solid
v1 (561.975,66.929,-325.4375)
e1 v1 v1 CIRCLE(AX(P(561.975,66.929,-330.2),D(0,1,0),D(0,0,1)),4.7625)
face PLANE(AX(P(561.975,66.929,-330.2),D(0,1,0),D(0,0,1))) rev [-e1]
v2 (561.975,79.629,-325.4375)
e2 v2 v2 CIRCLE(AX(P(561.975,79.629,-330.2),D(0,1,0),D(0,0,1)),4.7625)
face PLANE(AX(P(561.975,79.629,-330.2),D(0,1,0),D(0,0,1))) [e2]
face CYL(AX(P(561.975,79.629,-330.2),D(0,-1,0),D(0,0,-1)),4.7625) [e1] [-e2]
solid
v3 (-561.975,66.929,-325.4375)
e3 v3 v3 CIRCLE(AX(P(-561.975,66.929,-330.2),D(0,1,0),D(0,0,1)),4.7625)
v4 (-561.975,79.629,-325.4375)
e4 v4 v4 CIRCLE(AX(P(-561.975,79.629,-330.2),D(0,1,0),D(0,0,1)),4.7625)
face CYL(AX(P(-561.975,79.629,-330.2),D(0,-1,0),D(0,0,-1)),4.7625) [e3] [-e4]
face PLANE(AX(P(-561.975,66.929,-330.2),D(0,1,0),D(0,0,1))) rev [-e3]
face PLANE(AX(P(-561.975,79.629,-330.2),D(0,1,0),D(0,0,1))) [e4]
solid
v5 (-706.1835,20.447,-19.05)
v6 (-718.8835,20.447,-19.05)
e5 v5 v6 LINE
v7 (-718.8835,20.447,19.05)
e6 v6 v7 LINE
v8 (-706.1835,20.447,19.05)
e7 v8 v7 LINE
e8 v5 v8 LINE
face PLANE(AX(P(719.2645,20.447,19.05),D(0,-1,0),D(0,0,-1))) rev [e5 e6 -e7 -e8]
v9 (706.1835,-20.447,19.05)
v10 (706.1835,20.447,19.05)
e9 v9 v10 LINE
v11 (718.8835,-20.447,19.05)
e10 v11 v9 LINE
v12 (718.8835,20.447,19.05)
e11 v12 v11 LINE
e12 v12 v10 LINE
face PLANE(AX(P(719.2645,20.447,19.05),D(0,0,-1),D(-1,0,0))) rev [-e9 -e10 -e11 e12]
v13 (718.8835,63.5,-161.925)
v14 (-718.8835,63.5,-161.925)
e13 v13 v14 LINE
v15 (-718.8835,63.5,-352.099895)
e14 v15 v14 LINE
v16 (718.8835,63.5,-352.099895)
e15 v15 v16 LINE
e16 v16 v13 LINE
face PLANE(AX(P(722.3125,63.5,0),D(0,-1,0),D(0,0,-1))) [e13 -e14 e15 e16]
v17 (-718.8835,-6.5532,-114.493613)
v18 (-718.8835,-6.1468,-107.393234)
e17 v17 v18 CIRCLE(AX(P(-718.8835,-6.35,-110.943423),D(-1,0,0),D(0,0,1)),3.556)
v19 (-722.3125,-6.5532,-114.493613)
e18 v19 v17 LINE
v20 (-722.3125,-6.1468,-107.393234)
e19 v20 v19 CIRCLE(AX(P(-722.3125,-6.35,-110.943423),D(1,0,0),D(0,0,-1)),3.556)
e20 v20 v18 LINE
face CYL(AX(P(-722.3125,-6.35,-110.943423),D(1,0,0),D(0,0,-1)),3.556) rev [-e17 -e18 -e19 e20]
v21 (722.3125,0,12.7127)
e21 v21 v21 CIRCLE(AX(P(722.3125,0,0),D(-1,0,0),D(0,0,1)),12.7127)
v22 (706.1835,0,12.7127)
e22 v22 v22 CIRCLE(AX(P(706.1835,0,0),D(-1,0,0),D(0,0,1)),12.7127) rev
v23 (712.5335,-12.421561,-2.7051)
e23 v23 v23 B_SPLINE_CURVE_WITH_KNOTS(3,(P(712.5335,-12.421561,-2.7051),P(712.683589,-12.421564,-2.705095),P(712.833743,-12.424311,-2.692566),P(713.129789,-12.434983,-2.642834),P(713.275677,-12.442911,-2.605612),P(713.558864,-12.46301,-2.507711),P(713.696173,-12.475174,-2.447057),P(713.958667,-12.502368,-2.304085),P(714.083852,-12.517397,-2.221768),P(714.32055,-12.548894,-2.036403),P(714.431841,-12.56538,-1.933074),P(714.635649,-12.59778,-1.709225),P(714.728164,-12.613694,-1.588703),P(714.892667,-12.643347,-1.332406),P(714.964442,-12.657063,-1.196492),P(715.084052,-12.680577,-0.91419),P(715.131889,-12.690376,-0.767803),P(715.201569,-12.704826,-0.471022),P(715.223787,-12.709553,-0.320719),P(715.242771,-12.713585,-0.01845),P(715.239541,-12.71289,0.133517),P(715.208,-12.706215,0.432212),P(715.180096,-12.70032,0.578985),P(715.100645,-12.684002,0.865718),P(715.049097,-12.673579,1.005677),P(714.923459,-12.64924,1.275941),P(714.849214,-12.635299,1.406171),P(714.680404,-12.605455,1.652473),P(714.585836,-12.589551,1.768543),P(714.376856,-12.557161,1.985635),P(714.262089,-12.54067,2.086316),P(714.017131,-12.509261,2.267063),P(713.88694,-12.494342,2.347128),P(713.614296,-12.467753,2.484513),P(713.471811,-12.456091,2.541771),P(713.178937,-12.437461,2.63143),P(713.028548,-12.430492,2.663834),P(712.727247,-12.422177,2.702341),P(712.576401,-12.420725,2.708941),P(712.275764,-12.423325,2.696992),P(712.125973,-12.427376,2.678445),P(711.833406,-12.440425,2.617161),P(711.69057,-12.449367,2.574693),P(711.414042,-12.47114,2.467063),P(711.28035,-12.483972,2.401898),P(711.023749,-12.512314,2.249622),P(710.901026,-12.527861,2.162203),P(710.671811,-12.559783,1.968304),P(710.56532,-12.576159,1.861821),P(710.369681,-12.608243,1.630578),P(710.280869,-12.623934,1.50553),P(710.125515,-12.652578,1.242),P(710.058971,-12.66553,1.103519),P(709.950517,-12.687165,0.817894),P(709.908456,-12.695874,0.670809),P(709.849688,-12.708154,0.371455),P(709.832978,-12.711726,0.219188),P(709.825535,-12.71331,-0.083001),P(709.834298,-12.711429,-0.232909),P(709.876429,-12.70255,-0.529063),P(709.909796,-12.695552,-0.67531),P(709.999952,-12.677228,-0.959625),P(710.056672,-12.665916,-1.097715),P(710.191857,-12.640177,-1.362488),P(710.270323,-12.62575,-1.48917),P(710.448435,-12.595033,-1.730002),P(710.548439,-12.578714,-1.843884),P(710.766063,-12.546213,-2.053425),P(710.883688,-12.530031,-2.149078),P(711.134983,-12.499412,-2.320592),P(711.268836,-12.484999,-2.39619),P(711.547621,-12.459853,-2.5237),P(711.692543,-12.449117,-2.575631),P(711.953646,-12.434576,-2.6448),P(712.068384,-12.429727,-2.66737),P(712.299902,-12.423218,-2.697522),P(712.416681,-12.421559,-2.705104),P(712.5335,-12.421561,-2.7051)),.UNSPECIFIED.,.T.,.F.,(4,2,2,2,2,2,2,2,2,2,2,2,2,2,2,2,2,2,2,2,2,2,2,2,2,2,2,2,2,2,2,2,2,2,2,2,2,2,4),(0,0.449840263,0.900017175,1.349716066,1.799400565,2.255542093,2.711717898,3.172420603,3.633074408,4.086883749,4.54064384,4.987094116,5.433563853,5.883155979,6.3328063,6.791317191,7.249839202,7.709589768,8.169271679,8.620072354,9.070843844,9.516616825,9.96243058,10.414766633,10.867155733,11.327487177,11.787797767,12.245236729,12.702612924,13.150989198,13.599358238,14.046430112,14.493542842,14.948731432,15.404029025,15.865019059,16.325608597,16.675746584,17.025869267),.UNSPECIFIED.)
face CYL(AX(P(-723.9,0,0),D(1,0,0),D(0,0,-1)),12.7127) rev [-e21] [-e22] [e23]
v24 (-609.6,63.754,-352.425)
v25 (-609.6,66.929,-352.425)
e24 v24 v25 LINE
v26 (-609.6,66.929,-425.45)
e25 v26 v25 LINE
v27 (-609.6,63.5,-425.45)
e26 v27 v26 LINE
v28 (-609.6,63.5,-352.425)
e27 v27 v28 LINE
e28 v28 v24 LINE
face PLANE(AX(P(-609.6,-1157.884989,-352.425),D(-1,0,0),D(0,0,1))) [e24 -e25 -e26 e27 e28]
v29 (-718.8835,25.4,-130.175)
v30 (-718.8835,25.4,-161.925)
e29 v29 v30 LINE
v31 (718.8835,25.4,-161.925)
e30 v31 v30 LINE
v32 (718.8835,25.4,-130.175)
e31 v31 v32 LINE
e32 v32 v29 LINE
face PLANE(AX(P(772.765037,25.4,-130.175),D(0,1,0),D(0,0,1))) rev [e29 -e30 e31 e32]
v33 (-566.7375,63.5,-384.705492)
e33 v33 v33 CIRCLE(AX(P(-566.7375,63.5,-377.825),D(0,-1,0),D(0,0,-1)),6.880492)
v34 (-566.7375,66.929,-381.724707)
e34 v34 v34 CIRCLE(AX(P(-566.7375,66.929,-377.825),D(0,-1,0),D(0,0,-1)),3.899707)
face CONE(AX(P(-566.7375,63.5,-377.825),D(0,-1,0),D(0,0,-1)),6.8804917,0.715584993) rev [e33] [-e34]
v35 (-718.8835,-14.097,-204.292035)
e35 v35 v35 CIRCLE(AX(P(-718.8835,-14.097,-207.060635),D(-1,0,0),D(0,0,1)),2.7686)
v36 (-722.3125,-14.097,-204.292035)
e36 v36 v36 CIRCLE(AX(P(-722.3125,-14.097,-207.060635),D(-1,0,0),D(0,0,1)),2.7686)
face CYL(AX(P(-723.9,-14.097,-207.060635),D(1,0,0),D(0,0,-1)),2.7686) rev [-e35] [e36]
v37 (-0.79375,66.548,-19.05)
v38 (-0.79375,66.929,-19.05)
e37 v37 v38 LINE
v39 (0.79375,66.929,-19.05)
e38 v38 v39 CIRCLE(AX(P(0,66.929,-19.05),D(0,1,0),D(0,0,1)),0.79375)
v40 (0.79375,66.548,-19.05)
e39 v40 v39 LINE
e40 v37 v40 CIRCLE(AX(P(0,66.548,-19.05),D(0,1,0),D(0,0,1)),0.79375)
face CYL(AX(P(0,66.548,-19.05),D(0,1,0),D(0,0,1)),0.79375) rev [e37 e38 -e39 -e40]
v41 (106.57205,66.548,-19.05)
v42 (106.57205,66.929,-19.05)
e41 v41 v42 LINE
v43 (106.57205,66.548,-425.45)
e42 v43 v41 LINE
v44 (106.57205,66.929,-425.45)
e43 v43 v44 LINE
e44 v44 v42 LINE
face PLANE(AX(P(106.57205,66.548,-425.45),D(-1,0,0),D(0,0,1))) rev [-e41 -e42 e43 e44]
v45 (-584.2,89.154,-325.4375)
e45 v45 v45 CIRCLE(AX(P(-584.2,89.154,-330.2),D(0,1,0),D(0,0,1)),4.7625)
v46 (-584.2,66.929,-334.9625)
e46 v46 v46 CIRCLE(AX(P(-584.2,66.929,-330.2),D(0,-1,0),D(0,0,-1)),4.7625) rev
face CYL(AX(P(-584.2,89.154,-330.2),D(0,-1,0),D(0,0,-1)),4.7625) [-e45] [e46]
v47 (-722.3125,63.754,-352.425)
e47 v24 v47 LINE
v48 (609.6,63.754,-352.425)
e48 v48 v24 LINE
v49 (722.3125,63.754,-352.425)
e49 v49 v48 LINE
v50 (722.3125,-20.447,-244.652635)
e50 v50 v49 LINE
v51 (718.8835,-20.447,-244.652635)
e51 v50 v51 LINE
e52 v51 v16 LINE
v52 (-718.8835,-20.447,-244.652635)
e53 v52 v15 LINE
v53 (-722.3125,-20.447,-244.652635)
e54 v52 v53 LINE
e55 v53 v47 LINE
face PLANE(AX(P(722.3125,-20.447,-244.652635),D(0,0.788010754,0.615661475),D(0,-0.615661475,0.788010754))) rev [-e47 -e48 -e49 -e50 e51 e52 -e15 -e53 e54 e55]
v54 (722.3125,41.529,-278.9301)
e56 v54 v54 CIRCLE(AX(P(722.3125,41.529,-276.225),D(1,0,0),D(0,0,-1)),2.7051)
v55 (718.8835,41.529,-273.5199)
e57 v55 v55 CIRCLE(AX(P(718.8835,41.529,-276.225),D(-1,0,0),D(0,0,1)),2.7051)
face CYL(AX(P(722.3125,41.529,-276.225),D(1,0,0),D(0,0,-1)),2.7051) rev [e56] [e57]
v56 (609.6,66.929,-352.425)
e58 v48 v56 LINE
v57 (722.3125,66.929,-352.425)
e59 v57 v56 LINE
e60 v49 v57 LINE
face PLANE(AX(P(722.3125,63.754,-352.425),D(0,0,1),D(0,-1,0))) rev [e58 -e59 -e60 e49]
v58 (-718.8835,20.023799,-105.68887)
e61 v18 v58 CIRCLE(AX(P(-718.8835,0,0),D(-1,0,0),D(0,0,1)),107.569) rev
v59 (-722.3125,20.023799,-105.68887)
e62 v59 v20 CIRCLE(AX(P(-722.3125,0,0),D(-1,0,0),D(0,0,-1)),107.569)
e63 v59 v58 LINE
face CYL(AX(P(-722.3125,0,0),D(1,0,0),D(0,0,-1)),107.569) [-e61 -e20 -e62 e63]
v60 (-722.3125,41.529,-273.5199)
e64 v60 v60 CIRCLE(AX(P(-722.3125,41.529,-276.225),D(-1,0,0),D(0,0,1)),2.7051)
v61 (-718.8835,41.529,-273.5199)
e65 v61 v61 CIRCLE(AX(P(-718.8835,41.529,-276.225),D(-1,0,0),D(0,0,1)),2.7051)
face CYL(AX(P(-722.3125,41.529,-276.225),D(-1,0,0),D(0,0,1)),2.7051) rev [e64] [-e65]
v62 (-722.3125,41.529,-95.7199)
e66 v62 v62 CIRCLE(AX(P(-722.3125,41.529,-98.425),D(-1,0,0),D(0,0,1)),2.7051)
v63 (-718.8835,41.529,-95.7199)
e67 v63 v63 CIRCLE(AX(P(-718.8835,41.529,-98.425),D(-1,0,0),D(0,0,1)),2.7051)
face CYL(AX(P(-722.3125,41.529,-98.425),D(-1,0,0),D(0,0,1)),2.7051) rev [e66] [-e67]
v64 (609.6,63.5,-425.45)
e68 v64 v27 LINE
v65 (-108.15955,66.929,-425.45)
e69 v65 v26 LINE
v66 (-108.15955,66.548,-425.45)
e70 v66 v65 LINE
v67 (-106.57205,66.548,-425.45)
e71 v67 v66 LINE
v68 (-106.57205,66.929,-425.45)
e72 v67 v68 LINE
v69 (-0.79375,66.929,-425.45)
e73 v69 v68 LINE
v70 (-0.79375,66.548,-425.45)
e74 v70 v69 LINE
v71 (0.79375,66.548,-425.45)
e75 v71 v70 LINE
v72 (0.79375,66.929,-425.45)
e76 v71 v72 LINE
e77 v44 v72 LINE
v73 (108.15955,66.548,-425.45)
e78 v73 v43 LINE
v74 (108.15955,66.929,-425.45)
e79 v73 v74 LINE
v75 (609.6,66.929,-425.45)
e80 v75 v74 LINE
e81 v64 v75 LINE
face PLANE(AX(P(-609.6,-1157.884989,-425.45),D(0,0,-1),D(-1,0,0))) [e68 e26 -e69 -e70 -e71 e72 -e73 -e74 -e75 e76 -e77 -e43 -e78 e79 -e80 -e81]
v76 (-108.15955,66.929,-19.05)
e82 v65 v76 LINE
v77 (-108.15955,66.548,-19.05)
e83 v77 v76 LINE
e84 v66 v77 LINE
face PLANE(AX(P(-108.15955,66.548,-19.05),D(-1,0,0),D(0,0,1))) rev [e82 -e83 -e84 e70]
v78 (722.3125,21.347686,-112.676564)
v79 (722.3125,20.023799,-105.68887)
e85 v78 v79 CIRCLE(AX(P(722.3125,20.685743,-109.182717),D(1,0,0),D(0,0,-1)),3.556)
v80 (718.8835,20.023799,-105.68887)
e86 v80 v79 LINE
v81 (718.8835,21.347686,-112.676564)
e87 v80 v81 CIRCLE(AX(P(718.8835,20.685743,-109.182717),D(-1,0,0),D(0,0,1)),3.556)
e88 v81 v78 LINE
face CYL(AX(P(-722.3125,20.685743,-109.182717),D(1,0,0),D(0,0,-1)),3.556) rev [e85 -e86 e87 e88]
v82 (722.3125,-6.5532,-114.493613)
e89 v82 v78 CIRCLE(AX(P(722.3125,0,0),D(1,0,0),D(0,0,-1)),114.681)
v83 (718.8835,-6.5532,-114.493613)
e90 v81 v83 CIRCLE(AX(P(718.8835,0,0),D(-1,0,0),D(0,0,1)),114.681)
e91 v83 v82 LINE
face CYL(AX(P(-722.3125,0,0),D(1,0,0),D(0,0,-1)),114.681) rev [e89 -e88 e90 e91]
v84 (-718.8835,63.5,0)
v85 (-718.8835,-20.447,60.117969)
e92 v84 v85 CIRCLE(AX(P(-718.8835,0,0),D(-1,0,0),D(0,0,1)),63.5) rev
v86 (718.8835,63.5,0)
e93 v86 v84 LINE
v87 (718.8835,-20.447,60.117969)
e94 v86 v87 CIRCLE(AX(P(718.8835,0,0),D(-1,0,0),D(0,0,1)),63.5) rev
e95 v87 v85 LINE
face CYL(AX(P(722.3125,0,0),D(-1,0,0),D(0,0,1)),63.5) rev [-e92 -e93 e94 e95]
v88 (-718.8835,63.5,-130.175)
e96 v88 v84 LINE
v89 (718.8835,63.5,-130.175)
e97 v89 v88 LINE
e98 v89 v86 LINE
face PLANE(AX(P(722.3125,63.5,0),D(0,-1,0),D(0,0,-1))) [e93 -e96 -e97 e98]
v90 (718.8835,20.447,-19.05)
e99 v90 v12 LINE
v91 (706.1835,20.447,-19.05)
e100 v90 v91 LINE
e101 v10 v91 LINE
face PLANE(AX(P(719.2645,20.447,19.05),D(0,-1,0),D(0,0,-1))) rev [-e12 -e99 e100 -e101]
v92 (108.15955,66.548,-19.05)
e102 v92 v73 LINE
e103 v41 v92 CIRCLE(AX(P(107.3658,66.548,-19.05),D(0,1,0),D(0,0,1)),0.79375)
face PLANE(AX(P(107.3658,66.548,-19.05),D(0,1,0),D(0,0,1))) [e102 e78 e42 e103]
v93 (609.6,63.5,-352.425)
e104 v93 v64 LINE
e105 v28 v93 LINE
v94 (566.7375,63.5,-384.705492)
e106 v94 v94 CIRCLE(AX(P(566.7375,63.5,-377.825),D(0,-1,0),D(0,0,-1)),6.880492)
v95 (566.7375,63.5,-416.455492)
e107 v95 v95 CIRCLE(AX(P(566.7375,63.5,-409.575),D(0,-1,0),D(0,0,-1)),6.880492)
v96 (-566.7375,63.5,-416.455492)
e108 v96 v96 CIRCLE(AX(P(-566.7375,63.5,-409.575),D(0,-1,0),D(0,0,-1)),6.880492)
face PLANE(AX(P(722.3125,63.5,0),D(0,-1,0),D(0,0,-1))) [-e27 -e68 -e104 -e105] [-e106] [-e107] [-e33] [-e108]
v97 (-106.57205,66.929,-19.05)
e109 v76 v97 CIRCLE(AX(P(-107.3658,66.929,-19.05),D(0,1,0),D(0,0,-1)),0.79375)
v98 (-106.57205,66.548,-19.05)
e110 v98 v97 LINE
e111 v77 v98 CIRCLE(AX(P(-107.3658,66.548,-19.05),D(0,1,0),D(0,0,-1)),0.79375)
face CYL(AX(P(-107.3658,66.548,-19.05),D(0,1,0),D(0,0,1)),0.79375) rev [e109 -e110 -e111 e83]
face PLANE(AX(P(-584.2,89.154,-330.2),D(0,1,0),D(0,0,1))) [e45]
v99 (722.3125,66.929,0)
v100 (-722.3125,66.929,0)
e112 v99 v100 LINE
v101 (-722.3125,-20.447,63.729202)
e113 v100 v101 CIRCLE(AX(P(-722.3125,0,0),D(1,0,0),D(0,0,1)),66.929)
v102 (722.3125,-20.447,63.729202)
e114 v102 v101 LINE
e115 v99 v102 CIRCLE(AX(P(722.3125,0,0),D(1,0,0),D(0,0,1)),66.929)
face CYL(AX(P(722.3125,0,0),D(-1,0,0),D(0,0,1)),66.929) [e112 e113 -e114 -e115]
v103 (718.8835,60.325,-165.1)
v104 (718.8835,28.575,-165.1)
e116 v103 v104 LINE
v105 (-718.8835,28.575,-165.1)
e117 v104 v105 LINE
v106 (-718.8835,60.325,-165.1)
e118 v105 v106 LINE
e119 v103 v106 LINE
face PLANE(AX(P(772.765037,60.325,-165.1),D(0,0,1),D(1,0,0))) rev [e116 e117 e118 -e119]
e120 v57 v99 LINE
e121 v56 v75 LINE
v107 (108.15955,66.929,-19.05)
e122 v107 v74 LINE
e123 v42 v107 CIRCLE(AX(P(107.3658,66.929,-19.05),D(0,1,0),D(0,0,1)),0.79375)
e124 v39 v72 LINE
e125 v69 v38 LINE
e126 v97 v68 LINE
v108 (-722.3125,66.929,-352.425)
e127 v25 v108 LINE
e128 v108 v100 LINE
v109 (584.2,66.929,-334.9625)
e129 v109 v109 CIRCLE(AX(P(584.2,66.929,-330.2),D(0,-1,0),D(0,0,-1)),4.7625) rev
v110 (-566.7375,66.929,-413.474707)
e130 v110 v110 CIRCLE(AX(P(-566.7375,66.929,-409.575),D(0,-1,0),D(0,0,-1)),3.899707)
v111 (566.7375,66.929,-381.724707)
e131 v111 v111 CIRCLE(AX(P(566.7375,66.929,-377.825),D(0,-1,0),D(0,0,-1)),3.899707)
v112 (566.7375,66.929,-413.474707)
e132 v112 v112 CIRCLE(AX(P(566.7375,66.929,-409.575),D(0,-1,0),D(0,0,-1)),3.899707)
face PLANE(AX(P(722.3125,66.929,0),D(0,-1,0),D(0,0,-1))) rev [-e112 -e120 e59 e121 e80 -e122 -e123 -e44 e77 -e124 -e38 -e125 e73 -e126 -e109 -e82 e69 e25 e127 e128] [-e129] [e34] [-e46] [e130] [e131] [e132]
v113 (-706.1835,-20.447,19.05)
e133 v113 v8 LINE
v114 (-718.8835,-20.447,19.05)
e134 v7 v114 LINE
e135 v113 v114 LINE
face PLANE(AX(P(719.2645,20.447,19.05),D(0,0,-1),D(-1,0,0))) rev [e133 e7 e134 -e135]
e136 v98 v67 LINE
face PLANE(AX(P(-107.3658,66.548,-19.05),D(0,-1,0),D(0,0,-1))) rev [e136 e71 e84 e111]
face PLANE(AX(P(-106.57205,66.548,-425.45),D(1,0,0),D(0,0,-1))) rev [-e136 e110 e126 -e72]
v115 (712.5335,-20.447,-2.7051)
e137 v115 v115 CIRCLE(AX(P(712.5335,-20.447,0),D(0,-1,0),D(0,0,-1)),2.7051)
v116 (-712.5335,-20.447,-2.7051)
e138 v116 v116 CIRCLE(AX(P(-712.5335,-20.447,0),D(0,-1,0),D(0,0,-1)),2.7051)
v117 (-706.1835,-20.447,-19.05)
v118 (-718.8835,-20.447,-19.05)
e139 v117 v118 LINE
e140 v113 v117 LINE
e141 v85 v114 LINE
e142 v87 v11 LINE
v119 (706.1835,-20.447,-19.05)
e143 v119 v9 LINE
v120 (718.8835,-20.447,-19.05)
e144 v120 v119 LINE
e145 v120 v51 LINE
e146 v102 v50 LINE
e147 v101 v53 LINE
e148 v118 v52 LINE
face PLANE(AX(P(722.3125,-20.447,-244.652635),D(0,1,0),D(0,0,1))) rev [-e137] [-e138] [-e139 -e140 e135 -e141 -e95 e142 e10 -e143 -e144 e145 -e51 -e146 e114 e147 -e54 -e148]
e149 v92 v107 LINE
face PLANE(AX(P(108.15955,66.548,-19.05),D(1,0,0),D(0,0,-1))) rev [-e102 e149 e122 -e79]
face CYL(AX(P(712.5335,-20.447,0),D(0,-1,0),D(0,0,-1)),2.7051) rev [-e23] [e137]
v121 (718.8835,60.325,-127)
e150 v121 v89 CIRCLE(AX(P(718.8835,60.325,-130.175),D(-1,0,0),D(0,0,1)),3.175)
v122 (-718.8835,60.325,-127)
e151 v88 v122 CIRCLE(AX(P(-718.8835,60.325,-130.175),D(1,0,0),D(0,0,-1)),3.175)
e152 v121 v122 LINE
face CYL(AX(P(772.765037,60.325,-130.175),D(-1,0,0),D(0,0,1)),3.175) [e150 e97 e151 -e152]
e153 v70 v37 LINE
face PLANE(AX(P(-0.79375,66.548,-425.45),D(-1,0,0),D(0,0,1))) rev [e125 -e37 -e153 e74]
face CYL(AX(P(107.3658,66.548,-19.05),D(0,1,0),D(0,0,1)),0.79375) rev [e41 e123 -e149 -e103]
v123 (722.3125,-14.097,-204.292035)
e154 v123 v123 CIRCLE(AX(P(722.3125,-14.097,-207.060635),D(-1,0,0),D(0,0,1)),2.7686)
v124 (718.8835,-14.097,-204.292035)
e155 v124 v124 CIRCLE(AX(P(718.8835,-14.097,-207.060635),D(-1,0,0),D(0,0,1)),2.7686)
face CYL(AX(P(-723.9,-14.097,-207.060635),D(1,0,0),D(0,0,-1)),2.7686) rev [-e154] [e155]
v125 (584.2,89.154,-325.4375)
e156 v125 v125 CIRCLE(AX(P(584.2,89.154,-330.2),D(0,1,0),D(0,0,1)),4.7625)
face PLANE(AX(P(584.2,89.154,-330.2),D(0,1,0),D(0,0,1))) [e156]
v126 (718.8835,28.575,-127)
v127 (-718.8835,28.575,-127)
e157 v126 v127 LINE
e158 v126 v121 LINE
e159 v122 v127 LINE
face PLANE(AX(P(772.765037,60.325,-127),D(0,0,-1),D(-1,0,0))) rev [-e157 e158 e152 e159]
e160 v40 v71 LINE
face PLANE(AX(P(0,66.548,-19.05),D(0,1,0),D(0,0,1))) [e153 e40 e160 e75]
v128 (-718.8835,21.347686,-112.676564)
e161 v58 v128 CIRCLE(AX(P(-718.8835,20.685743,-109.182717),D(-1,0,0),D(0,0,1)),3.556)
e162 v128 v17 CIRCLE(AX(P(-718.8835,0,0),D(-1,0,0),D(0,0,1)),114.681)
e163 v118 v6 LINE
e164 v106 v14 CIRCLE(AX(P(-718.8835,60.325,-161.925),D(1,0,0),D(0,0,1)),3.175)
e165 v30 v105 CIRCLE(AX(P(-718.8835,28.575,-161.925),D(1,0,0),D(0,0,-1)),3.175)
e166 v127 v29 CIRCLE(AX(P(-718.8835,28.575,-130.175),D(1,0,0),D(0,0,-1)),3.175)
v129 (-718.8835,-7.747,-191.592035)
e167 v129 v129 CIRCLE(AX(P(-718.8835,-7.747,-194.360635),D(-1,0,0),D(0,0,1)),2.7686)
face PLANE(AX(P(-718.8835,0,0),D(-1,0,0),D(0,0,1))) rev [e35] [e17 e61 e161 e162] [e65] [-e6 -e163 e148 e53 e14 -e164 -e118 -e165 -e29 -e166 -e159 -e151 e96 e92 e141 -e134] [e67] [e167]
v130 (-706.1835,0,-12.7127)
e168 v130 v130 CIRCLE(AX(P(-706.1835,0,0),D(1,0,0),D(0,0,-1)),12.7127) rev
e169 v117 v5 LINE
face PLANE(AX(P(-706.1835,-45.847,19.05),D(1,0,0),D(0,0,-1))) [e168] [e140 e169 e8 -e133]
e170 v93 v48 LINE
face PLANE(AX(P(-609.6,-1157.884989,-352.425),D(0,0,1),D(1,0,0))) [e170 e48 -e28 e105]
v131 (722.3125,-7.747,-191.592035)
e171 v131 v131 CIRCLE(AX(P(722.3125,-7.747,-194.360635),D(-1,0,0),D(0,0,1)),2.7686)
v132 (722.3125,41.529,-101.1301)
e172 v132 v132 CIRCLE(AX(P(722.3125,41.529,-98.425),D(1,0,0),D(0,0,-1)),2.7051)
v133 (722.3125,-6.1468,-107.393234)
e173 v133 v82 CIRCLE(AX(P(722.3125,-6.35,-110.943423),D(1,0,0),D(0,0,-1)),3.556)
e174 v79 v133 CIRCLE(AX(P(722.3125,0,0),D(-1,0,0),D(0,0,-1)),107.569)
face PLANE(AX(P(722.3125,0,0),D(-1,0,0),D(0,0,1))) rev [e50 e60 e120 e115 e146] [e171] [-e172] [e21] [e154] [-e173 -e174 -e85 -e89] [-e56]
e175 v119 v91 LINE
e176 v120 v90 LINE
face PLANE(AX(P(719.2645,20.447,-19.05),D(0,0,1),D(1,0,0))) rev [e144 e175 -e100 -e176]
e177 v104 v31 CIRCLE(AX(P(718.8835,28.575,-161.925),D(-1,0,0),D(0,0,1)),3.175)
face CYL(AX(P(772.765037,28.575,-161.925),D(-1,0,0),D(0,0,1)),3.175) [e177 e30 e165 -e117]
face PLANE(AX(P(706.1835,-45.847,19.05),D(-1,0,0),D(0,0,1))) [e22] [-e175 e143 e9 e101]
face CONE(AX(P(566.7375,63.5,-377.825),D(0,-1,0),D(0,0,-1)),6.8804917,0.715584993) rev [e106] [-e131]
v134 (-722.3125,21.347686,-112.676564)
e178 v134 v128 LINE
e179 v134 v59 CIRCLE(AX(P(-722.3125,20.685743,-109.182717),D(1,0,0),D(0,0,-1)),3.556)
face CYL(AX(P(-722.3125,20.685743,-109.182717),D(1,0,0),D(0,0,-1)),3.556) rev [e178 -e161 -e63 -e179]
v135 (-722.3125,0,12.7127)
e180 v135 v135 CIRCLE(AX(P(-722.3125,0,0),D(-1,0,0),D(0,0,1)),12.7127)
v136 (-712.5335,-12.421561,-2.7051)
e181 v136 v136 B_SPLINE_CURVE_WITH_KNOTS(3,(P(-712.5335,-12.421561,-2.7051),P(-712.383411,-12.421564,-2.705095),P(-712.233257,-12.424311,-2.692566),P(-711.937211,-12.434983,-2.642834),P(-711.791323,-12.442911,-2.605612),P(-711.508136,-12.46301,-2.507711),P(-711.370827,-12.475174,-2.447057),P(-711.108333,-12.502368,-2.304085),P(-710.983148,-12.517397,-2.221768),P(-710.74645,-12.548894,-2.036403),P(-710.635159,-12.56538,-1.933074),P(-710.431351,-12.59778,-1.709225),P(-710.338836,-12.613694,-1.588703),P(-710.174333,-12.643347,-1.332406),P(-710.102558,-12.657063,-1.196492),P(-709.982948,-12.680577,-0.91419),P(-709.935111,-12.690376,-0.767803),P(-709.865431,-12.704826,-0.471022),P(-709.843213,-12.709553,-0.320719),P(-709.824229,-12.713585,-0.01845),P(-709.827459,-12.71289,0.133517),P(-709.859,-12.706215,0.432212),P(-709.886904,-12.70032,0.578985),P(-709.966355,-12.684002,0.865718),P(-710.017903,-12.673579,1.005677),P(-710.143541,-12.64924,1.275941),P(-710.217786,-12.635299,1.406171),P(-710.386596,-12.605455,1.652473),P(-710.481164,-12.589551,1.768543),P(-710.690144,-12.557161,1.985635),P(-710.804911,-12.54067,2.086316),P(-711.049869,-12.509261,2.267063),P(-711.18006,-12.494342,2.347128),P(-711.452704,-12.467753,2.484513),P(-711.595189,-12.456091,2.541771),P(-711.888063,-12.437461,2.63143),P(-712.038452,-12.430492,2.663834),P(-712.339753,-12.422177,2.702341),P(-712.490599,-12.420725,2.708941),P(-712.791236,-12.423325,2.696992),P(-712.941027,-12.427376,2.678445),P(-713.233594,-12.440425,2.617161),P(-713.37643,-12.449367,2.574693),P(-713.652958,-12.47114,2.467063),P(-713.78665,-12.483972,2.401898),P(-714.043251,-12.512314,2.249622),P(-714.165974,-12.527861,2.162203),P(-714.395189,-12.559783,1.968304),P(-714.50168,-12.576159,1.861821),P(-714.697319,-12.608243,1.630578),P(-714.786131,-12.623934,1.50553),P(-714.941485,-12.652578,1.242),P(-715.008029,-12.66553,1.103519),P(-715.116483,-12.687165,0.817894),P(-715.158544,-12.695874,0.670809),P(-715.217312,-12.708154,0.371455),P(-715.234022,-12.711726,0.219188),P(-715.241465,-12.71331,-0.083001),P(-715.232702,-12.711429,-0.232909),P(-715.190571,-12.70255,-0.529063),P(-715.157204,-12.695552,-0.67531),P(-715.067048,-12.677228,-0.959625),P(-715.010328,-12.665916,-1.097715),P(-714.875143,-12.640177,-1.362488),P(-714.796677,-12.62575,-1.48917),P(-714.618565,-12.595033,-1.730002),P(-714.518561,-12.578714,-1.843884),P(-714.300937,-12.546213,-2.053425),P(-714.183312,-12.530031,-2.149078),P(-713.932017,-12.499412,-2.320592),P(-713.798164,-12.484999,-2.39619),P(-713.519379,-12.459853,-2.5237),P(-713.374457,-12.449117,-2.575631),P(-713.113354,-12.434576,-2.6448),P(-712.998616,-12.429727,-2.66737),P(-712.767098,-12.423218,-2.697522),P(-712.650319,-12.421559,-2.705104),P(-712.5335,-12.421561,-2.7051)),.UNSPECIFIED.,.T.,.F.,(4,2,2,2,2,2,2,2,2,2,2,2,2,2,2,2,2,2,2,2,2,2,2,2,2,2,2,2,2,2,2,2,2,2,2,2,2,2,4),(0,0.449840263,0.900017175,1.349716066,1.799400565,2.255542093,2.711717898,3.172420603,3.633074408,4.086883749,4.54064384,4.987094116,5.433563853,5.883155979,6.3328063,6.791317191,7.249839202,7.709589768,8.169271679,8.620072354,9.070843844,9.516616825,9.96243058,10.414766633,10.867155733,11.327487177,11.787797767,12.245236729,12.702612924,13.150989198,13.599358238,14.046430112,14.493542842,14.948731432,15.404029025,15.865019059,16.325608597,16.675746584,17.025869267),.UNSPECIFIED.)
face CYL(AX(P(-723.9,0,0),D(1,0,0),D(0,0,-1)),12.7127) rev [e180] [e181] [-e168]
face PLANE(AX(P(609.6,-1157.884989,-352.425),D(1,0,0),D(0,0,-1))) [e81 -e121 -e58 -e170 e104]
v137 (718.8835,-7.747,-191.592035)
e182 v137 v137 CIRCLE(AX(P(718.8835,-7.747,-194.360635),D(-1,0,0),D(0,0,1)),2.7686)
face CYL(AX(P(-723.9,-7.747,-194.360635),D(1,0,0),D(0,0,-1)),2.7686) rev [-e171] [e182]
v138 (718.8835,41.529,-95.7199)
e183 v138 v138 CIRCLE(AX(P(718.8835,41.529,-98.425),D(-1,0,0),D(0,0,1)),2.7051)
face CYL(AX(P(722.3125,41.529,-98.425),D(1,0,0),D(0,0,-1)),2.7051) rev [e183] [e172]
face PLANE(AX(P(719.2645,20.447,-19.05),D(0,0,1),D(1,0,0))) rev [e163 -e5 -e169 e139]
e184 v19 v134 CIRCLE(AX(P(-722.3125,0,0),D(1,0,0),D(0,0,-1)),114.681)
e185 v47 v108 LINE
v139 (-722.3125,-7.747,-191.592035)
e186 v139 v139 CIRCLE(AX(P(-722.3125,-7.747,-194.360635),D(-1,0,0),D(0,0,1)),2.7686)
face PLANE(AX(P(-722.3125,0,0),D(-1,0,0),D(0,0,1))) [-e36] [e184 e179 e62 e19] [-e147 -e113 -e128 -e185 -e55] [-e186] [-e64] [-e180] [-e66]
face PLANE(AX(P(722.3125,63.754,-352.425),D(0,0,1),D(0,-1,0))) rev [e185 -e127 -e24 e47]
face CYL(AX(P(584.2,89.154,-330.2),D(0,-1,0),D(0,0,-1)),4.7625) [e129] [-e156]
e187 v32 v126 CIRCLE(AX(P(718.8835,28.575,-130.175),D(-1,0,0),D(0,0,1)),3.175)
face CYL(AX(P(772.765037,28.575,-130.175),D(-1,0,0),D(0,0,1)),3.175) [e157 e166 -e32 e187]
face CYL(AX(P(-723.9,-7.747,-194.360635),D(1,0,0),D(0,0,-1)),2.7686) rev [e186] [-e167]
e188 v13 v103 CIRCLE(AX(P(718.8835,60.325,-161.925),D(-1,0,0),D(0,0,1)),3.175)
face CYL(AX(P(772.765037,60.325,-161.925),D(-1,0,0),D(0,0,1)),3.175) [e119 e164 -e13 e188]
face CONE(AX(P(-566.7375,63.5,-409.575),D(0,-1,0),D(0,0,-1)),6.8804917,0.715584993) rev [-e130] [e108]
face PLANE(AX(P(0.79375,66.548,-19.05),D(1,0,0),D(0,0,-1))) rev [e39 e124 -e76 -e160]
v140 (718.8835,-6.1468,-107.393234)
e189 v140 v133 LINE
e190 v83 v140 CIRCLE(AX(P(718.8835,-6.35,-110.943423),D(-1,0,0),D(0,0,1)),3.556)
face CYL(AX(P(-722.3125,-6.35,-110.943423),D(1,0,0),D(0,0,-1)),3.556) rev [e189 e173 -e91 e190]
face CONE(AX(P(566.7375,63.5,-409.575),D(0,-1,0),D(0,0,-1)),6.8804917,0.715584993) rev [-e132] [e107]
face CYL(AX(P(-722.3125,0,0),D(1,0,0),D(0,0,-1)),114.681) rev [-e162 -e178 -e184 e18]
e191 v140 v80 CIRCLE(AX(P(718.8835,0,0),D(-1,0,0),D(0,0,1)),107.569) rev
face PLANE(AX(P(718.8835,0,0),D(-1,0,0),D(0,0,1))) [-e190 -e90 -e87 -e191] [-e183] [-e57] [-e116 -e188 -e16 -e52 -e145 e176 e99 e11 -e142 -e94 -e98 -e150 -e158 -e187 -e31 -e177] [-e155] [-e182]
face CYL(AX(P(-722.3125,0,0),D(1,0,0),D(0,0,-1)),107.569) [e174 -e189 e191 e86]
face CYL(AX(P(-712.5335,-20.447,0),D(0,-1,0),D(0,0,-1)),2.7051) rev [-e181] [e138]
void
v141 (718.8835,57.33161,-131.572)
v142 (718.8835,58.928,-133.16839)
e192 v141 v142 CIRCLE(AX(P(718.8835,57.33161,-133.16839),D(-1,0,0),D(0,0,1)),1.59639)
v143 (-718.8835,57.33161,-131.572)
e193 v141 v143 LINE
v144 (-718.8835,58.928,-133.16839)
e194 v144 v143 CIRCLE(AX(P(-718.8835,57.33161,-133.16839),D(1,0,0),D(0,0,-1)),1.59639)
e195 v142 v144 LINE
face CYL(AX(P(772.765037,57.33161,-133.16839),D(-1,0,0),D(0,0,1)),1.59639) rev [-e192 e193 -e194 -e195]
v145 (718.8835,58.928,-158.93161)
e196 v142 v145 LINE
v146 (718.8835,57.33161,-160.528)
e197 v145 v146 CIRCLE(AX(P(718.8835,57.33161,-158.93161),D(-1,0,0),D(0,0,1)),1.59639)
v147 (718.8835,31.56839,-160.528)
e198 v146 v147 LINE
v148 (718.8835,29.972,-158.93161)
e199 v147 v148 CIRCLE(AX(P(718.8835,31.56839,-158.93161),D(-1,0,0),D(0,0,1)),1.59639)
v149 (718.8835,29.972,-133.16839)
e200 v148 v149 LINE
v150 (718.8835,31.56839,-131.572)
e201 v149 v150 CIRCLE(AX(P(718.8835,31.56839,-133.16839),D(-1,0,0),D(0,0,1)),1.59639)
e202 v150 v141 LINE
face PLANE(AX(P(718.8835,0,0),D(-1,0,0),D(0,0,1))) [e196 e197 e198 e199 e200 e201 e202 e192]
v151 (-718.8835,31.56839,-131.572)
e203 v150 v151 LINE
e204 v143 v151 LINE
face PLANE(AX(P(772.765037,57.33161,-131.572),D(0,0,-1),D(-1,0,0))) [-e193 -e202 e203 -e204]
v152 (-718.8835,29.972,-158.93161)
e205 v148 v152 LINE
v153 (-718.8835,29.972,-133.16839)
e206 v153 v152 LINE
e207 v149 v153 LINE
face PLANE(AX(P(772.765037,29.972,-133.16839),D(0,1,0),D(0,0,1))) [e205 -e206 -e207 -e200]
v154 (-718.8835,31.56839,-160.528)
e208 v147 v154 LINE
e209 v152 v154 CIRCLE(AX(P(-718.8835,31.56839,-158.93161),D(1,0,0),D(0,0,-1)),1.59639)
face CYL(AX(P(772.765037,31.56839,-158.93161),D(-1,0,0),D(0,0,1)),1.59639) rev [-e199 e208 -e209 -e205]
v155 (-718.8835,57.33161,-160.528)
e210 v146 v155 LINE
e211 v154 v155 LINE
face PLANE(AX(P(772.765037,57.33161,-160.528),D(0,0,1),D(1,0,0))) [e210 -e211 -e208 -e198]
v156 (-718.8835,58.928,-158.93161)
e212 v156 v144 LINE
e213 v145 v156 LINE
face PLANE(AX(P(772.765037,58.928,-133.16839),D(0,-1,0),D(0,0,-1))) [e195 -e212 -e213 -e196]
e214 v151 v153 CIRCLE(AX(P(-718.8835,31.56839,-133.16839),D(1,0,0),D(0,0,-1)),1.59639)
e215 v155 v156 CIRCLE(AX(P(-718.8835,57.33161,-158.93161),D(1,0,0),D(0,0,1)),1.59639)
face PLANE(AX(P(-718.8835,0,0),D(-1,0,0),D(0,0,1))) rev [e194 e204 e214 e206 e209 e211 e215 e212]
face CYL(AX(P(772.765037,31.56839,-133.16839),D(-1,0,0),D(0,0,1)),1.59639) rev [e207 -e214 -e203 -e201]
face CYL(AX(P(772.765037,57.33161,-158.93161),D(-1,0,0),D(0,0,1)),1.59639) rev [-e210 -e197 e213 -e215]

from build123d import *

# Parameters (mm, degrees)
EXTRUDE1_DEPTH                                = 722.3125
SHELL1_T                                      = -3.429
SKETCH19_W                                    = 1437.767
SKETCH19_H                                    = 25.4
CUT_EXTRUDE2_DEPTH                            = 2.54
ARC_SLOT_DEPTH                                = 1489.497316857
SKETCH3_R                                     = 2.7686
EXTRUDE3_DEPTH                                = 723.9
SKETCH5_W                                     = 38.1
SKETCH5_H                                     = 40.894
EXTRUDE5_DEPTH                                = 719.2645
SKETCH4_R                                     = 12.7127
EXTRUDE4_DEPTH                                = 723.9
EXTRUDE6_DEPTH                                = 25.4
EXTRUDE6_DEPTH_BACK                           = 40.894
SKETCH6_W                                     = 1412.367
SKETCH6_H                                     = 38.1
F_1_4_28_TAPPED_HOLE1_REACH                   = 810.439
F_1_4_28_TAPPED_HOLE1_BORE_R                  = 2.7051
SQUARE_TUBING_DEPTH                           = 1437.767
SKETCH20_W                                    = 1219.2
SKETCH20_H                                    = 73.025
EXTENSION_DEPTH                               = 3.429
SKETCH22_R                                    = 4.7625
BOSS_EXTRUDE1_DEPTH                           = 12.7
BOSS_EXTRUDE1_2_DEPTH                         = 12.7
SKETCH25_R                                    = 4.7625
BOSS_EXTRUDE2_DEPTH                           = 22.225
CSK_FOR_1_4_FLAT_HEAD_MACHINE_SCREW1_AT_COUNT = 2
CSK_FOR_1_4_FLAT_HEAD_MACHINE_SCREW1_AT_PITCH = 31.75
CSK_FOR_1_4_FLAT_HEAD_MACHINE_SCREW1_2_COUNT  = 2
CSK_FOR_1_4_FLAT_HEAD_MACHINE_SCREW1_2_PITCH  = 1133.919590679
CSK_FOR_1_4_FLAT_HEAD_MACHINE_SCREW1_3_COUNT  = 2
CSK_FOR_1_4_FLAT_HEAD_MACHINE_SCREW1_3_PITCH  = 1133.475
CUT_EXTRUDE3_DEPTH                            = 0.381
F_1_4_28_START                                = 718.8835
F_1_4_28_TAPPED_HOLE2_OUTLINE_R               = 2.7051
F_1_4_28_TAPPED_HOLE2_DEPTH                   = 3.429


# Read off the part's stored shape, not the designer's step: 1/4-28 Tapped Hole2
with BuildPart() as part:
    # Sketch1 → Extrude1 (new, symmetric)
    with BuildSketch(Plane(origin=(0, 0, 0), x_dir=(0, 0, -1), z_dir=(1, 0, 0))):
        with BuildLine():
            Line((0, 66.929), (352.425, 66.929))
            Line((352.425, 66.929), (352.425, 63.754))
            Line((352.425, 63.754), (244.652634628, -20.447))
            Line((244.652634628, -20.447), (-63.729202349, -20.447))
            ThreePointArc((-63.729202349, -20.447), (-54.073969264, 39.439788146), (0, 66.929))
        make_face()
    extrude(amount=EXTRUDE1_DEPTH, both=True)

    # Shell1
    shell1_openings = [part.faces().sort_by_distance(p)[0] for p in [
        (0, -20.447, -90.46171614),
        (0, 21.6535, -298.538817314),
    ]]
    offset(amount=SHELL1_T, openings=shell1_openings, kind=Kind.INTERSECTION)

    # Sketch19 → Cut-Extrude2 (cut)
    with BuildSketch(Plane.XZ.offset(-63.5)):
        with Locations((0, -344.926857936)):
            Rectangle(SKETCH19_W, SKETCH19_H)
    extrude(amount=CUT_EXTRUDE2_DEPTH, mode=Mode.SUBTRACT)

    # Sketch12 → ARC SLOT (cut, through all)
    with BuildSketch(Plane(origin=(722.3125, 0, 0), x_dir=(0, 0, -1), z_dir=(1, 0, 0))):
        with BuildLine():
            ThreePointArc((114.49361262, -6.5532), (114.438573641, 7.452826572), (112.676563863, 21.347686455))
            ThreePointArc((112.676563863, 21.347686455), (108.520773156, 24.179589631), (105.68886998, 20.023798923))
            ThreePointArc((105.68886998, 20.023798923), (107.341607834, 6.990635777), (107.393233543, -6.1468))
            ThreePointArc((107.393233543, -6.1468), (110.740223081, -9.900189539), (114.49361262, -6.5532))
        make_face()
    extrude(amount=-ARC_SLOT_DEPTH, mode=Mode.SUBTRACT)

    # Sketch3 → Extrude3 (cut, symmetric)
    with BuildSketch(Plane(origin=(0, 0, 0), x_dir=(0, 0, -1), z_dir=(1, 0, 0))):
        with Locations(Location((194.360634628, -7.747, 0), (0, 0, 180))):
            Circle(SKETCH3_R)
        with Locations(Location((207.060634628, -14.097, 0), (0, 0, 180))):
            Circle(SKETCH3_R)
    extrude(amount=EXTRUDE3_DEPTH, both=True, mode=Mode.SUBTRACT)

    # Sketch5 → Extrude5 (add, symmetric)
    with BuildSketch(Plane(origin=(0, 0, 0), x_dir=(0, 0, -1), z_dir=(1, 0, 0))):
        Rectangle(SKETCH5_W, SKETCH5_H)
    extrude(amount=EXTRUDE5_DEPTH, both=True)

    # Sketch4 → Extrude4 (cut, symmetric)
    with BuildSketch(Plane(origin=(0, 0, 0), x_dir=(0, 0, -1), z_dir=(1, 0, 0))):
        with Locations(Location((0, 0, 0), (0, 0, 180))):
            Circle(SKETCH4_R)
    extrude(amount=EXTRUDE4_DEPTH, both=True, mode=Mode.SUBTRACT)

    # Sketch6 → Extrude6 (cut, two sides: drawn at the far end of the back side and taken through both)
    with BuildSketch(Plane.XZ.offset(20.447).offset(-EXTRUDE6_DEPTH_BACK)):
        Rectangle(SKETCH6_W, SKETCH6_H)
    extrude(amount=EXTRUDE6_DEPTH + EXTRUDE6_DEPTH_BACK, mode=Mode.SUBTRACT)

    # 1/4-28 Tapped Hole1 bore → 1/4-28 Tapped Hole1 (cut, up to next)
    with BuildSketch(Plane.XZ.offset(20.447), mode=Mode.PRIVATE) as f_1_4_28_tapped_hole1_sk1:
        with Locations((712.5335, 0)):
            Circle(F_1_4_28_TAPPED_HOLE1_BORE_R)
    f_1_4_28_tapped_hole1_tool1 = extrude(f_1_4_28_tapped_hole1_sk1.sketch, amount=-F_1_4_28_TAPPED_HOLE1_REACH, mode=Mode.PRIVATE) & part.part
    # 1/4-28 Tapped Hole1 bore → 1/4-28 Tapped Hole1 (cut, up to next)
    with BuildSketch(Plane.XZ.offset(20.447), mode=Mode.PRIVATE) as f_1_4_28_tapped_hole1_sk2:
        with Locations((-712.5335, 0)):
            Circle(F_1_4_28_TAPPED_HOLE1_BORE_R)
    f_1_4_28_tapped_hole1_tool2 = extrude(f_1_4_28_tapped_hole1_sk2.sketch, amount=-F_1_4_28_TAPPED_HOLE1_REACH, mode=Mode.PRIVATE) & part.part
    add(f_1_4_28_tapped_hole1_tool1.solids().sort_by_distance((712.5335, -20.447, 0))[0], mode=Mode.SUBTRACT)
    add(f_1_4_28_tapped_hole1_tool2.solids().sort_by_distance((-712.5335, -20.447, 0))[0], mode=Mode.SUBTRACT)

    # Sketch18 → SQUARE TUBING (add)
    with BuildSketch(Plane(origin=(-718.8835, 0, 0), x_dir=(0, 0, -1), z_dir=(1, 0, 0))):
        with BuildLine():
            Line((130.175, 63.5), (161.925, 63.5))
            ThreePointArc((161.925, 63.5), (164.17006403, 62.57006403), (165.1, 60.325))
            Line((165.1, 60.325), (165.1, 28.575))
            ThreePointArc((165.1, 28.575), (164.17006403, 26.32993597), (161.925, 25.4))
            Line((161.925, 25.4), (130.175, 25.4))
            ThreePointArc((130.175, 25.4), (127.92993597, 26.32993597), (127, 28.575))
            Line((127, 28.575), (127, 60.325))
            ThreePointArc((127, 60.325), (127.92993597, 62.57006403), (130.175, 63.5))
        make_face()
        with BuildLine():
            Line((133.16839, 58.928), (158.93161, 58.928))
            ThreePointArc((158.93161, 58.928), (160.060428194, 58.460428194), (160.528, 57.33161))
            Line((160.528, 57.33161), (160.528, 31.56839))
            ThreePointArc((160.528, 31.56839), (160.060428194, 30.439571806), (158.93161, 29.972))
            Line((158.93161, 29.972), (133.16839, 29.972))
            ThreePointArc((133.16839, 29.972), (132.039571806, 30.439571806), (131.572, 31.56839))
            Line((131.572, 31.56839), (131.572, 57.33161))
            ThreePointArc((131.572, 57.33161), (132.039571806, 58.460428194), (133.16839, 58.928))
        make_face(mode=Mode.SUBTRACT)
    extrude(amount=SQUARE_TUBING_DEPTH)

    # Sketch20 → EXTENSION (add)
    with BuildSketch(Plane(origin=(0, 66.929, 0), x_dir=(1, 0, 0), z_dir=(0, 1, 0))):
        with Locations((0, 388.9375)):
            Rectangle(SKETCH20_W, SKETCH20_H)
    extrude(amount=-EXTENSION_DEPTH)

    # Sketch25 → Boss-Extrude2 (add)
    with BuildSketch(Plane(origin=(0, 66.929, 0), x_dir=(1, 0, 0), z_dir=(0, 1, 0))):
        with Locations(Location((-584.2, 330.2, 0), (0, 0, 90))):
            Circle(SKETCH25_R)
        with Locations(Location((584.2, 330.2, 0), (0, 0, 90))):
            Circle(SKETCH25_R)
    extrude(amount=BOSS_EXTRUDE2_DEPTH)

    # Sketch26 → CSK for 1/4 Flat Head Machine Screw1 (revolve, cut)
    with BuildSketch(Plane(origin=(-566.7375, 63.5, -409.575), x_dir=(0, 0, -1), z_dir=(1, 0, 0))):
        Polygon((0, 0), (0, 3.43005), (3.57124, 3.43005), (3.57124, 3.806858607), (6.8804917, 0), align=None)
    csk_for_1_4_flat_head_machine_screw1 = revolve(axis=Axis((-566.7375, 57.15, -409.575), (0, 1, 0)), mode=Mode.SUBTRACT)

    # CSK for 1/4 Flat Head Machine Screw1 at: CSK for 1/4 Flat Head Machine Screw1 ×2
    with Locations(*[(0, 0, i * CSK_FOR_1_4_FLAT_HEAD_MACHINE_SCREW1_AT_PITCH) for i in range(1, CSK_FOR_1_4_FLAT_HEAD_MACHINE_SCREW1_AT_COUNT)]):
        add(csk_for_1_4_flat_head_machine_screw1, mode=Mode.SUBTRACT)

    # CSK for 1_4 Flat Head Machine Screw1 2: CSK for 1/4 Flat Head Machine Screw1 ×2
    with Locations(*[Vector(0.9996079169260532, 0, 0.028000221762634604) * (i * CSK_FOR_1_4_FLAT_HEAD_MACHINE_SCREW1_2_PITCH) for i in range(1, CSK_FOR_1_4_FLAT_HEAD_MACHINE_SCREW1_2_COUNT)]):
        add(csk_for_1_4_flat_head_machine_screw1, mode=Mode.SUBTRACT)

    # CSK for 1_4 Flat Head Machine Screw1 3: CSK for 1/4 Flat Head Machine Screw1 ×2
    with Locations(*[(i * CSK_FOR_1_4_FLAT_HEAD_MACHINE_SCREW1_3_PITCH, 0, 0) for i in range(1, CSK_FOR_1_4_FLAT_HEAD_MACHINE_SCREW1_3_COUNT)]):
        add(csk_for_1_4_flat_head_machine_screw1, mode=Mode.SUBTRACT)

    # Sketch28 → Cut-Extrude3 (cut)
    with BuildSketch(Plane(origin=(0, 66.929, 0), x_dir=(1, 0, 0), z_dir=(0, 1, 0))):
        with BuildLine():
            Line((-0.79375, 425.45), (-0.79375, 19.05))
            ThreePointArc((-0.79375, 19.05), (0, 18.25625), (0.79375, 19.05))
            Line((0.79375, 19.05), (0.79375, 425.45))
            Line((0.79375, 425.45), (-0.79375, 425.45))
        make_face()
        with BuildLine():
            Line((106.57205, 425.45), (106.57205, 19.05))
            ThreePointArc((106.57205, 19.05), (107.3658, 18.25625), (108.15955, 19.05))
            Line((108.15955, 19.05), (108.15955, 425.45))
            Line((108.15955, 425.45), (106.57205, 425.45))
        make_face()
        with BuildLine():
            Line((-108.15955, 425.45), (-106.57205, 425.45))
            Line((-106.57205, 425.45), (-106.57205, 19.05))
            ThreePointArc((-106.57205, 19.05), (-107.3658, 18.25625), (-108.15955, 19.05))
            Line((-108.15955, 19.05), (-108.15955, 425.45))
        make_face()
    extrude(amount=-CUT_EXTRUDE3_DEPTH, mode=Mode.SUBTRACT)

    # 1/4-28 Tapped Hole2 outline → 1/4-28 Tapped Hole2 (cut)
    with BuildSketch(Plane.YZ.offset(F_1_4_28_START)):
        with Locations((41.529, -276.225)):
            Circle(F_1_4_28_TAPPED_HOLE2_OUTLINE_R)
        with Locations((41.529, -98.425)):
            Circle(F_1_4_28_TAPPED_HOLE2_OUTLINE_R)
    f_1_4_28_tapped_hole2 = extrude(amount=F_1_4_28_TAPPED_HOLE2_DEPTH, mode=Mode.SUBTRACT)

    # Mirror1: 1/4-28 Tapped Hole2 across plane
    add(f_1_4_28_tapped_hole2.mirror(Plane(origin=(0, 0, 0), x_dir=(0, 0, 1), z_dir=(1, 0, 0))), mode=Mode.SUBTRACT)


with BuildPart() as body_2:
    # Sketch22 → Boss-Extrude1 (new body)
    with BuildSketch(Plane(origin=(0, 66.929, 0), x_dir=(-1, 0, 0), z_dir=(0, 1, 0))):
        with Locations(Location((561.975, -330.2, 0), (0, 0, 90))):
            Circle(SKETCH22_R)
    extrude(amount=BOSS_EXTRUDE1_DEPTH)


with BuildPart() as body_3:
    # Sketch22 → Boss-Extrude1 2 (new body)
    with BuildSketch(Plane(origin=(0, 66.929, 0), x_dir=(-1, 0, 0), z_dir=(0, 1, 0))):
        with Locations(Location((-561.975, -330.2, 0), (0, 0, 90))):
            Circle(SKETCH22_R)
    extrude(amount=BOSS_EXTRUDE1_2_DEPTH)


solid = Compound([part.part, body_2.part, body_3.part])
